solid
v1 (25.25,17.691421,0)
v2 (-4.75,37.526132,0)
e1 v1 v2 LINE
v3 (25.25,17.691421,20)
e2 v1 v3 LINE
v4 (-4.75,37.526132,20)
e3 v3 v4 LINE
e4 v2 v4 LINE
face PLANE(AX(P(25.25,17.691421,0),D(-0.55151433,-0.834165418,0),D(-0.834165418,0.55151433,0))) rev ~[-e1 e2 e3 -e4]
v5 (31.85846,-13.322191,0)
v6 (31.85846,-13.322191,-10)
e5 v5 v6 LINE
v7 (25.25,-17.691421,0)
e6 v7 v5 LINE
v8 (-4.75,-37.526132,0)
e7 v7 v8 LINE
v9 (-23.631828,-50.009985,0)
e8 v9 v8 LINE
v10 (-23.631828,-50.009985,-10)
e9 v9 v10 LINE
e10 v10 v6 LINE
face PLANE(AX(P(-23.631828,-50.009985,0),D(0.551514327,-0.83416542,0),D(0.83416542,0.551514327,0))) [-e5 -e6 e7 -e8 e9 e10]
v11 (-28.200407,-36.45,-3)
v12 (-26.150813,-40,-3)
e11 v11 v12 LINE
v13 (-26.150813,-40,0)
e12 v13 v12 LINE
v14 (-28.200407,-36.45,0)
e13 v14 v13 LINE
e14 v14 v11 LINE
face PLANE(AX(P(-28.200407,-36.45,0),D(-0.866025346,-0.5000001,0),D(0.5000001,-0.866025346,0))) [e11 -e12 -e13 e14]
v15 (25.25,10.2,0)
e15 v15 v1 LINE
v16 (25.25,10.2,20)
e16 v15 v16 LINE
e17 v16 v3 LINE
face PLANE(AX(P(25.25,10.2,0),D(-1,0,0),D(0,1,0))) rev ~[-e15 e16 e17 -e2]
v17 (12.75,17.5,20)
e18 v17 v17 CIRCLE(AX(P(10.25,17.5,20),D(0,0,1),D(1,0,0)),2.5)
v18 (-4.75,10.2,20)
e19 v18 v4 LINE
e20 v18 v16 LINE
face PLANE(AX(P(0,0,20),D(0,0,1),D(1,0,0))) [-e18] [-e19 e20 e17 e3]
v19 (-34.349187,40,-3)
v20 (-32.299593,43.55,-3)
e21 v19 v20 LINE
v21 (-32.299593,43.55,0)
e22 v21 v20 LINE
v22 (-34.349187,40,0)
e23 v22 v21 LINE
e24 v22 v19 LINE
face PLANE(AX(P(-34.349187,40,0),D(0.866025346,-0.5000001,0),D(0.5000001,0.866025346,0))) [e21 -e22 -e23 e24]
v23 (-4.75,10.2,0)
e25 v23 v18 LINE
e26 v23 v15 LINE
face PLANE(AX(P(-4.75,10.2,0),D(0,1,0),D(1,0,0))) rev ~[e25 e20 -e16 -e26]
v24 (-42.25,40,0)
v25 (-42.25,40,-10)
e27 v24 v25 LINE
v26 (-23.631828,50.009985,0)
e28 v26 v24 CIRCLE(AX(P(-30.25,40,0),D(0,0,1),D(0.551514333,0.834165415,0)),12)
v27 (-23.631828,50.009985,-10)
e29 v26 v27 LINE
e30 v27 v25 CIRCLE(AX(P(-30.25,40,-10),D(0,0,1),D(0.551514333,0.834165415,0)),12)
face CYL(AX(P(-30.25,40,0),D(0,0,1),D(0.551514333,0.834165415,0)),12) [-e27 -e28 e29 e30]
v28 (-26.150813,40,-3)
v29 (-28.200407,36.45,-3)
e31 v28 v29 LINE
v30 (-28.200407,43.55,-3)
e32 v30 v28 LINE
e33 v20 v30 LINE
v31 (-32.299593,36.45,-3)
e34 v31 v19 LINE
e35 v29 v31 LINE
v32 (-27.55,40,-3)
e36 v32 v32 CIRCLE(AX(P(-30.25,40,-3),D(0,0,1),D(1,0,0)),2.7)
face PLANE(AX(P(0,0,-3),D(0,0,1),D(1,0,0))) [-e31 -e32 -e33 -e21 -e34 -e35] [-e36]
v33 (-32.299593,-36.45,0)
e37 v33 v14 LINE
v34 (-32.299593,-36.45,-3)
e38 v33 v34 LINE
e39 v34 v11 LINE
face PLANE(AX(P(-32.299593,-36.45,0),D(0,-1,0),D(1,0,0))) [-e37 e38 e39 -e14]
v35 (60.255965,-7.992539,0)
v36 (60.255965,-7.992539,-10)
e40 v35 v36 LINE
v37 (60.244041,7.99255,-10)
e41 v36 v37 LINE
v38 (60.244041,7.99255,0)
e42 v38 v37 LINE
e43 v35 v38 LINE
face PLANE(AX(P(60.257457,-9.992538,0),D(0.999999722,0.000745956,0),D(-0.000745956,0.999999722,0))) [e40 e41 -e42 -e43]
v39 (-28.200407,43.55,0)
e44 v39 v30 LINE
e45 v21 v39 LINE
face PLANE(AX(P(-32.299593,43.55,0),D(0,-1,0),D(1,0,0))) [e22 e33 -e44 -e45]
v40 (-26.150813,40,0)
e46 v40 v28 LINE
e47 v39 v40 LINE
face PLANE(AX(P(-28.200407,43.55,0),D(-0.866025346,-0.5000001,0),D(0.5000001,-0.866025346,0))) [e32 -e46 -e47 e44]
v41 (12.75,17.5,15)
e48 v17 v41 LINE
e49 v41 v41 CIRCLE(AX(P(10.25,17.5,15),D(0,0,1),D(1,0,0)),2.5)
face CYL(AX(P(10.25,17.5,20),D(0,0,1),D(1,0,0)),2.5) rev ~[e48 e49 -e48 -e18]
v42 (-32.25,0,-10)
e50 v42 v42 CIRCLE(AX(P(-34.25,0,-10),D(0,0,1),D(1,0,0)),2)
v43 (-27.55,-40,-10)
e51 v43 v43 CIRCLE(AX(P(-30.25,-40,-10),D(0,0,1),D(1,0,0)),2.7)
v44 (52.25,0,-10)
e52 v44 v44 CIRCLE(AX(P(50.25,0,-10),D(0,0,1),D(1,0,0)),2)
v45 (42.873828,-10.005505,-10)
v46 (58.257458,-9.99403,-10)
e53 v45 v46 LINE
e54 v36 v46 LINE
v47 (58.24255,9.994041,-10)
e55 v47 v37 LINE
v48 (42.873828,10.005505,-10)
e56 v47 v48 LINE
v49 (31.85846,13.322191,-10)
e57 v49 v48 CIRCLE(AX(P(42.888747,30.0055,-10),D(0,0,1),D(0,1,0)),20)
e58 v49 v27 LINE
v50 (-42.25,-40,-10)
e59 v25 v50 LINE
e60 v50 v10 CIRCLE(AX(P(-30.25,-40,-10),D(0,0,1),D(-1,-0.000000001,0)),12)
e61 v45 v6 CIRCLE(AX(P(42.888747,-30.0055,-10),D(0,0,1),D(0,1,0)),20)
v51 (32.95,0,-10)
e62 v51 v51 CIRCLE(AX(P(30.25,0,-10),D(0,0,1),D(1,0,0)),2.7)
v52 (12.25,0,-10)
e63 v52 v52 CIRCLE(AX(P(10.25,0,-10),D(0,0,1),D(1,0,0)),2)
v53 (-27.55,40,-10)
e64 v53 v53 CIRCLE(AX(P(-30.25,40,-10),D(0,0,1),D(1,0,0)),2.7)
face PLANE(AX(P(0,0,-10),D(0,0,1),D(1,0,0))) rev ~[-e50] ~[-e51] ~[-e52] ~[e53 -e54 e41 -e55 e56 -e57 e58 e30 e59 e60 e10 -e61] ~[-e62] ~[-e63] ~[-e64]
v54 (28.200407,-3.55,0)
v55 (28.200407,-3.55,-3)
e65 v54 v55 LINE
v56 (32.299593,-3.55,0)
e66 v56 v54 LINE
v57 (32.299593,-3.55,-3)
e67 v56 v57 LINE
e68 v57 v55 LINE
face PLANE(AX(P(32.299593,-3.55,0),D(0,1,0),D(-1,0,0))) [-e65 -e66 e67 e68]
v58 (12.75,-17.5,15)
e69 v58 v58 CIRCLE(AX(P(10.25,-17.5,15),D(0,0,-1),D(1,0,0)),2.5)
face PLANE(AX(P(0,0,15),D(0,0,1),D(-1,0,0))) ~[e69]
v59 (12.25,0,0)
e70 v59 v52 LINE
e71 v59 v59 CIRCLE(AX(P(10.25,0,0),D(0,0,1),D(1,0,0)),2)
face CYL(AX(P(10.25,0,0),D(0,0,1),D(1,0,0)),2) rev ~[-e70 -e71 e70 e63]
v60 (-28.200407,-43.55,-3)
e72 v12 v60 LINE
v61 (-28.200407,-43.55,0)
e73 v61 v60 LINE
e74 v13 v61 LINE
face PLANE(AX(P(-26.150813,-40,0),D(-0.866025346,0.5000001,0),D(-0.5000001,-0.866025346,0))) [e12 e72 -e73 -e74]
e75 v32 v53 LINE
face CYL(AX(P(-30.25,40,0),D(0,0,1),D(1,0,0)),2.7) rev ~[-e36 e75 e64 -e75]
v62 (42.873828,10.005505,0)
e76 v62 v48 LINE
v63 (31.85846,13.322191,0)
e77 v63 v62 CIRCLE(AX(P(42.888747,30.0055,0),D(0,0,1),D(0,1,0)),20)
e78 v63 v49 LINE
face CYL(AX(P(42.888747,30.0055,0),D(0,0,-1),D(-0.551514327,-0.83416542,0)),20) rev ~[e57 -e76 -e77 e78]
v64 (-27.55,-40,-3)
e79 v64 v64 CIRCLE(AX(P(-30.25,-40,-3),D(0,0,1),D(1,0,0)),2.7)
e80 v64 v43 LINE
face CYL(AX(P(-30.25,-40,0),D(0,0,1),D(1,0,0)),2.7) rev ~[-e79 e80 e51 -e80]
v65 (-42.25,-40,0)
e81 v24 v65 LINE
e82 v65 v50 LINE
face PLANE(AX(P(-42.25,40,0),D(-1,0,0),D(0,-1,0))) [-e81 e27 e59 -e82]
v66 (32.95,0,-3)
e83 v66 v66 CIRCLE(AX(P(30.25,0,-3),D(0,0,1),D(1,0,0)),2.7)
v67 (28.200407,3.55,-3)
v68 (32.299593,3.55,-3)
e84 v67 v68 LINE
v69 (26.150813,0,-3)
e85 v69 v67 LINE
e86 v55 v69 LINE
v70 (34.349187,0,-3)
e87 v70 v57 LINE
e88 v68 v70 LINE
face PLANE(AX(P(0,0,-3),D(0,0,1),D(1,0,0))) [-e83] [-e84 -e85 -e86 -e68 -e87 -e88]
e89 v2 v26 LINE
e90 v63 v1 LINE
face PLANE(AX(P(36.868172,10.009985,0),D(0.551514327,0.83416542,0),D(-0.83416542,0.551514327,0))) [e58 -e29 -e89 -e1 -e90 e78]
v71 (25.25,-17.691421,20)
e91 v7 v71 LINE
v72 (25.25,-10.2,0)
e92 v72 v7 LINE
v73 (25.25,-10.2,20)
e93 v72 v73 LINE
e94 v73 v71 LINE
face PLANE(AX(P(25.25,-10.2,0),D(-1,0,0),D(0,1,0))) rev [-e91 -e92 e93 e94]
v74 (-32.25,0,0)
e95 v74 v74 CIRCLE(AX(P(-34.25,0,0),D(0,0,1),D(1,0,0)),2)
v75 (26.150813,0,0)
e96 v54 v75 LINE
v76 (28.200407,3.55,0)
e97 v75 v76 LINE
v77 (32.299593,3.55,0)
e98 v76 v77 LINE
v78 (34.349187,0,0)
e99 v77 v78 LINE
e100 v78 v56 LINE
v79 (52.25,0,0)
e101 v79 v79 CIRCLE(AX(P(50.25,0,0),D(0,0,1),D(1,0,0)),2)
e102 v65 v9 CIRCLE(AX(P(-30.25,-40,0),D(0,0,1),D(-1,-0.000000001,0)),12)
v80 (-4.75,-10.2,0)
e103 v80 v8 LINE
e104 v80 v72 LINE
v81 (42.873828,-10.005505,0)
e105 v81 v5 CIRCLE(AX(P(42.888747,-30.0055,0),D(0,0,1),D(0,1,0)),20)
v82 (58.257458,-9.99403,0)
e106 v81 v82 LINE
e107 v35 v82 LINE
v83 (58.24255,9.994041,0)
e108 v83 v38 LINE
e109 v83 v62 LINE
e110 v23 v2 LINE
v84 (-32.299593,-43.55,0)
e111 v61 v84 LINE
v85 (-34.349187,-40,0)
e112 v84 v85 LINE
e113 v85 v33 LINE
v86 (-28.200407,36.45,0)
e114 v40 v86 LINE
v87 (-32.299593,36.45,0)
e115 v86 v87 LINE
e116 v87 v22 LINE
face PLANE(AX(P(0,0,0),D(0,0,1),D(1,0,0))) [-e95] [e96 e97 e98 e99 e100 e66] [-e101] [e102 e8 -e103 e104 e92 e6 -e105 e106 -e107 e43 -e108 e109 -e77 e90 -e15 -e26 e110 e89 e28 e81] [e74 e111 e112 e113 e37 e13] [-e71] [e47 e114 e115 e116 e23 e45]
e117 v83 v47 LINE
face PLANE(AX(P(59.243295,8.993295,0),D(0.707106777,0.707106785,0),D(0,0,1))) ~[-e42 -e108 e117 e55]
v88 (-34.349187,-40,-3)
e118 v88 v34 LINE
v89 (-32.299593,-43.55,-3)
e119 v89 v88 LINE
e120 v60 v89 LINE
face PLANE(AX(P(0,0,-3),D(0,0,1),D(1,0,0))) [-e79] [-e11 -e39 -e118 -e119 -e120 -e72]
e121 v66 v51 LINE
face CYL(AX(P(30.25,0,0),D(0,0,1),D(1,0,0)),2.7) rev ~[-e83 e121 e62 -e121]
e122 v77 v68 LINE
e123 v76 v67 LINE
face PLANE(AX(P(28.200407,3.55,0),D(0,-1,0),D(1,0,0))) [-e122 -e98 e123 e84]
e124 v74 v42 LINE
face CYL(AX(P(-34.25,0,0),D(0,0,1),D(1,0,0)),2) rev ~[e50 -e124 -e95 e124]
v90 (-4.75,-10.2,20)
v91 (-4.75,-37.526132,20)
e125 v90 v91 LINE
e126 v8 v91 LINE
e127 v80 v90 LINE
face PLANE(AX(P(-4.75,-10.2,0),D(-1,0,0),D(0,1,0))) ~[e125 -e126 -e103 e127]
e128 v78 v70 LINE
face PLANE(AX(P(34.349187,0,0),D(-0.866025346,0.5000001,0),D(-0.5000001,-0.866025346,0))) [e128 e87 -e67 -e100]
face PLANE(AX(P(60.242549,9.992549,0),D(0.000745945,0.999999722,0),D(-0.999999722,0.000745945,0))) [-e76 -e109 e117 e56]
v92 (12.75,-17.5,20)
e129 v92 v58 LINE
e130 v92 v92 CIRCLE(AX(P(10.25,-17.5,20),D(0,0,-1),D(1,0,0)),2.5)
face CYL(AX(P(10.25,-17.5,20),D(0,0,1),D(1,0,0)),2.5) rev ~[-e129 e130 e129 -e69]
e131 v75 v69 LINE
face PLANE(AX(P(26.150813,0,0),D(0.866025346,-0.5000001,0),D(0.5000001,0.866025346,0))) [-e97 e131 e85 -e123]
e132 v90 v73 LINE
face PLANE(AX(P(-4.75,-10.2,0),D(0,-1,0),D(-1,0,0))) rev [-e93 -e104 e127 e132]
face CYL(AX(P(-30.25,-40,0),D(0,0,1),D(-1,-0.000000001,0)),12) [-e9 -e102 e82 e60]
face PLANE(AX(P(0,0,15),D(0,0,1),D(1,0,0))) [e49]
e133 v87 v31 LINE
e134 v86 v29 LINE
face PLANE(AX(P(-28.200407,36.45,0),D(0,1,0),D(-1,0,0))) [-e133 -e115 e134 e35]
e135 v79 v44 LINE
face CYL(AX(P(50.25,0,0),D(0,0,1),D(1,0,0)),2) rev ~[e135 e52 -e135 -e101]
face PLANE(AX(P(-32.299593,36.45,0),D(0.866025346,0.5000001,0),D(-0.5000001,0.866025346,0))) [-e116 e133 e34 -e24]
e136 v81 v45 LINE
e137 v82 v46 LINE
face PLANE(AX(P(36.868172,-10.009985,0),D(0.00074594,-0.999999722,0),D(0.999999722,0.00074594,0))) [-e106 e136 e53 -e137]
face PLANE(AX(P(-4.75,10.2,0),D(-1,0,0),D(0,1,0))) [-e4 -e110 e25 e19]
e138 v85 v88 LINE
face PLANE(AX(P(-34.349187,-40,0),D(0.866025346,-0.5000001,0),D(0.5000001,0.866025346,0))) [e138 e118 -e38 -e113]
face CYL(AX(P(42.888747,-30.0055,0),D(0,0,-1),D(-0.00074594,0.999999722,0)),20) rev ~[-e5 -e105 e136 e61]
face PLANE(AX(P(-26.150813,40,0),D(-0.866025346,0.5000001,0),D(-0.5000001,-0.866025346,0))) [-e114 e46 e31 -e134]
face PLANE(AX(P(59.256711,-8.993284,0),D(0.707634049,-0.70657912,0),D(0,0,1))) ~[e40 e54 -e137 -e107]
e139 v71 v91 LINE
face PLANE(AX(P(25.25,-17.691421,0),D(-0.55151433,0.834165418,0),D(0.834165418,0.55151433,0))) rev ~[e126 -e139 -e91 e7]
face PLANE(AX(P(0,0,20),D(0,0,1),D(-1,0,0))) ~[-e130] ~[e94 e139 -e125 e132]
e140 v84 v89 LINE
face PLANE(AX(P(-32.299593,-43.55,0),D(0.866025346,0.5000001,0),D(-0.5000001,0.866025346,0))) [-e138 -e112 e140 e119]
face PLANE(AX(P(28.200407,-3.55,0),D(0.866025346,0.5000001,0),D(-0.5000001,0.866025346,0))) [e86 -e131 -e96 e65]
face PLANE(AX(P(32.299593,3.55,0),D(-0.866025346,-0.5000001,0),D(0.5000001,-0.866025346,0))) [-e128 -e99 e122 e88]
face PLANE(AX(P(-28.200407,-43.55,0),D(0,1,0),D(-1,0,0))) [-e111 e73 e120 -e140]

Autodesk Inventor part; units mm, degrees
ref_plane "YZ Plane" through (0, 0, 0) normal (1, 0, 0) x (0, 1, 0)
ref_plane "XZ Plane" through (0, 0, 0) normal (0, 1, 0) x (-1, 0, 0)
ref_plane "XY Plane" through (0, 0, 0) normal (0, 0, 1) x (1, 0, 0)
sketch "Sketch1" plane through (0, 0, 0) normal (0, 0, 1) x (1, 0, 0)
  line L0 (0, 0) -> (30.25, 0) construction
  line L1 (0, 0) -> (-30.25, 0) construction
  line L2 (-30.25, 0) -> (-30.25, 40) construction
  line L3 (-30.25, 0) -> (-30.25, -40) construction
  circle A0 centre (-30.25, 40) radius 2.7
  circle A1 centre (-30.25, -40) radius 2.7
  circle A2 centre (30.25, 0) radius 2.7
  circle A3 centre (-30.25, 40) radius 12
  circle A4 centre (-30.25, -40) radius 12
  circle A5 centre (30.25, 0) radius 12
  line L4 (36.868172, -10.009985) -> (-23.631828, -50.009985)
  line L5 (-42.25, 40) -> (-42.25, -40)
  circle A6 centre (-34.25, 0) radius 2
  line L6 (-30.25, 0) -> (-34.25, 0) construction
  line L7 (-23.631828, 50.009985) -> (36.868172, 10.009985)
  line L8 (30.25, 0) -> (50.25, 0) construction
  circle A7 centre (50.25, 0) radius 10
  circle A8 centre (50.25, 0) radius 2
  line L9 (50.25746, 9.999997) -> (36.868172, 10.009985)
  line L10 (50.25746, -9.999997) -> (36.868172, -10.009985)
  circle A9 centre (10.25, 0) radius 2
  line L11 (50.25746, -9.999997) -> (60.257457, -9.992538)
  line L12 (60.257457, -9.992538) -> (60.242549, 9.992549)
  line L13 (60.242549, 9.992549) -> (50.25746, 9.999997)
  point P0 (-42.25, 0)
  point P1 (41.35, -4.559605)
  point P2 (41.35, 4.559605)
  point P3 (60.249997, 0.00746)
  dimension "d0" = 60.5
  dimension "d1" = 5.4
  dimension "d2" = 80
  dimension "d3" = 24
  dimension "d55" = 4
  dimension "d56" = 8
  dimension "d57" = 20
  dimension "d58" = 20
  dimension "d69" = 20
sketch "Sketch1 outline for Extrusion1" plane through (0, 0, 0) normal (0, 0, 1) x (1, 0, 0)
  arc A0 (-23.631828, 50.009985) -> (-42.25, 40) centre (-30.25, 40) ccw
  line L0 (-42.25, 40) -> (-42.25, -40)
  arc A1 (-42.25, -40) -> (-23.631828, -50.009985) centre (-30.25, -40) ccw
  line L1 (-23.631828, -50.009985) -> (36.868172, -10.009985)
  line L2 (36.868172, -10.009985) -> (60.257457, -9.992538)
  line L3 (60.257457, -9.992538) -> (60.242549, 9.992549)
  line L4 (60.242549, 9.992549) -> (36.868172, 10.009985)
  line L5 (36.868172, 10.009985) -> (-23.631828, 50.009985)
  circle A2 centre (-30.25, 40) radius 2.7
  circle A3 centre (10.25, 0) radius 2
  circle A4 centre (-34.25, 0) radius 2
  circle A5 centre (30.25, 0) radius 2.7
  circle A6 centre (-30.25, -40) radius 2.7
  circle A7 centre (50.25, 0) radius 2
extrude "Extrusion1" add sketch "Sketch1 outline for Extrusion1" against normal blind 10
fillet "Fillet1" radius 20 2 edges at (36.8682, 10.01, -5) (36.8682, -10.01, -5)
chamfer "Chamfer6" distance 2 angle 45 2 edges at (60.2425, 9.9925, -5) (60.2575, -9.9925, -5)
sketch "Sketch8" plane through (0, 0, 0) normal (0, 0, 1) x (1, 0, 0)
  line L0 (58.257457, -9.99403) -> (60.255965, -7.992538)
  line L1 (58.257457, -9.99403) -> (42.873828, -10.005505)
  arc A0 (42.873828, -10.005505) -> (31.85846, -13.322191) centre (42.888747, -30.0055) ccw
  line L2 (31.85846, -13.322191) -> (-23.631828, -50.009985)
  arc A1 (-42.25, -40) -> (-23.631828, -50.009985) centre (-30.25, -40) ccw
  line L3 (-42.25, -40) -> (-42.25, 40)
  arc A2 (-23.631828, 50.009985) -> (-42.25, 40) centre (-30.25, 40) ccw
  line L4 (-23.631828, 50.009985) -> (31.85846, 13.322191)
  arc A3 (31.85846, 13.322191) -> (42.873828, 10.005505) centre (42.888747, 30.0055) ccw
  line L5 (42.873828, 10.005505) -> (58.242549, 9.994041)
  line L6 (60.244041, 7.992549) -> (58.242549, 9.994041)
  line L7 (60.244041, 7.992549) -> (60.255965, -7.992538)
  circle A4 centre (30.25, 0) radius 2.7
  circle A5 centre (50.25, 0) radius 2
  circle A6 centre (-30.25, -40) radius 2.7
  circle A7 centre (-34.25, 0) radius 2
  circle A8 centre (10.25, 0) radius 2
  circle A9 centre (-30.25, 40) radius 2.7
  line L8 (-28.200407, -43.55) -> (-32.299593, -43.55)
  line L9 (-32.299593, -43.55) -> (-34.349187, -40)
  line L10 (-34.349187, -40) -> (-32.299593, -36.45)
  line L11 (-32.299593, -36.45) -> (-28.200407, -36.45)
  line L12 (-28.200407, -36.45) -> (-26.150813, -40)
  line L13 (-26.150813, -40) -> (-28.200407, -43.55)
  line L14 (-28.200407, 36.45) -> (-32.299593, 36.45)
  line L15 (-32.299593, 36.45) -> (-34.349187, 40)
  line L16 (-34.349187, 40) -> (-32.299593, 43.55)
  line L17 (-32.299593, 43.55) -> (-28.200407, 43.55)
  line L18 (-28.200407, 43.55) -> (-26.150813, 40)
  line L19 (-26.150813, 40) -> (-28.200407, 36.45)
  line L20 (32.299593, -3.55) -> (28.200407, -3.55)
  line L21 (28.200407, -3.55) -> (26.150813, 0)
  line L22 (26.150813, 0) -> (28.200407, 3.55)
  line L23 (28.200407, 3.55) -> (32.299593, 3.55)
  line L24 (32.299593, 3.55) -> (34.349187, 0)
  line L25 (34.349187, 0) -> (32.299593, -3.55)
  point P0 (0, 0)
  dimension "d83" = 7.1
  dimension "d84" = 7.1
  dimension "d85" = 7.1
extrude "Extrusion9" cut sketch "Sketch8" against normal blind 3 contours L8 L9 L10 L11 L12 L13 | L14 L15 L16 L17 L18 L19 | L20 L21 L22 L23 L24 L25
sketch "Sketch5" plane through (0, 0, 0) normal (0, 0, 1) x (1, 0, 0)
  arc A0 (-42.25, -40) -> (-23.631828, -50.009985) centre (-30.25, -40) ccw
  line L0 (-23.631828, -50.009985) -> (31.85846, -13.322191)
  arc A1 (42.873828, -10.005505) -> (31.85846, -13.322191) centre (42.888747, -30.0055) ccw
  line L1 (42.873828, -10.005505) -> (58.257457, -9.99403)
  arc A2 (31.85846, 13.322191) -> (42.873828, 10.005505) centre (42.888747, 30.0055) ccw
  line L2 (31.85846, 13.322191) -> (-23.631828, 50.009985)
  arc A3 (-23.631828, 50.009985) -> (-42.25, 40) centre (-30.25, 40) ccw
  line L3 (-42.25, 40) -> (-42.25, -40)
  circle A4 centre (-34.25, 0) radius 2
  circle A5 centre (50.25, 0) radius 2
  line L4 (-4.75, 10.2) -> (-4.75, 37.526132)
  line L5 (-4.75, 10.2) -> (25.25, 10.2)
  line L6 (25.25, 10.2) -> (25.25, 17.691421)
  line L7 (60.255965, -7.992538) -> (60.244041, 7.992549)
  line L8 (58.242549, 9.994041) -> (42.873828, 10.005505)
  line L9 (60.255965, -7.992538) -> (58.257457, -9.99403)
  line L10 (58.242549, 9.994041) -> (60.244041, 7.992549)
  dimension "d66" = 30
  dimension "d92" = 10.2
  dimension "d93" = 25
extrude "Extrusion6" add sketch "Sketch5" along normal blind 20 contours L2 L6 L5 L4
sketch "Sketch9" plane through (0, 0, 20) normal (0, 0, 1) x (1, 0, 0)
  circle A0 centre (10.25, 0) radius 2
  line L0 (25.25, 10.2) -> (25.25, 17.691421)
  line L1 (25.25, 17.691421) -> (-4.75, 37.526132)
  line L2 (-4.75, 37.526132) -> (-4.75, 10.2)
  line L3 (-4.75, 10.2) -> (25.25, 10.2)
  line L4 (10.25, 0) -> (10.25, 17.5) construction
  circle A1 centre (10.25, 17.5) radius 2.5
  point P0 (0, 0)
  dimension "d88" = 17.5
  dimension "d89" = 5
extrude "Extrusion10" cut sketch "Sketch9" against normal blind 5 contours A1
mirror "Mirror1" about plane through (0, 0, 0) normal (0, 1, 0) of "Extrusion10", "Extrusion6"
equation "\"d84\" = d83"
equation "\"d85\" = d83"
equation "\"b\" = 2"
properties part number "y axis something back_3DPrint"
